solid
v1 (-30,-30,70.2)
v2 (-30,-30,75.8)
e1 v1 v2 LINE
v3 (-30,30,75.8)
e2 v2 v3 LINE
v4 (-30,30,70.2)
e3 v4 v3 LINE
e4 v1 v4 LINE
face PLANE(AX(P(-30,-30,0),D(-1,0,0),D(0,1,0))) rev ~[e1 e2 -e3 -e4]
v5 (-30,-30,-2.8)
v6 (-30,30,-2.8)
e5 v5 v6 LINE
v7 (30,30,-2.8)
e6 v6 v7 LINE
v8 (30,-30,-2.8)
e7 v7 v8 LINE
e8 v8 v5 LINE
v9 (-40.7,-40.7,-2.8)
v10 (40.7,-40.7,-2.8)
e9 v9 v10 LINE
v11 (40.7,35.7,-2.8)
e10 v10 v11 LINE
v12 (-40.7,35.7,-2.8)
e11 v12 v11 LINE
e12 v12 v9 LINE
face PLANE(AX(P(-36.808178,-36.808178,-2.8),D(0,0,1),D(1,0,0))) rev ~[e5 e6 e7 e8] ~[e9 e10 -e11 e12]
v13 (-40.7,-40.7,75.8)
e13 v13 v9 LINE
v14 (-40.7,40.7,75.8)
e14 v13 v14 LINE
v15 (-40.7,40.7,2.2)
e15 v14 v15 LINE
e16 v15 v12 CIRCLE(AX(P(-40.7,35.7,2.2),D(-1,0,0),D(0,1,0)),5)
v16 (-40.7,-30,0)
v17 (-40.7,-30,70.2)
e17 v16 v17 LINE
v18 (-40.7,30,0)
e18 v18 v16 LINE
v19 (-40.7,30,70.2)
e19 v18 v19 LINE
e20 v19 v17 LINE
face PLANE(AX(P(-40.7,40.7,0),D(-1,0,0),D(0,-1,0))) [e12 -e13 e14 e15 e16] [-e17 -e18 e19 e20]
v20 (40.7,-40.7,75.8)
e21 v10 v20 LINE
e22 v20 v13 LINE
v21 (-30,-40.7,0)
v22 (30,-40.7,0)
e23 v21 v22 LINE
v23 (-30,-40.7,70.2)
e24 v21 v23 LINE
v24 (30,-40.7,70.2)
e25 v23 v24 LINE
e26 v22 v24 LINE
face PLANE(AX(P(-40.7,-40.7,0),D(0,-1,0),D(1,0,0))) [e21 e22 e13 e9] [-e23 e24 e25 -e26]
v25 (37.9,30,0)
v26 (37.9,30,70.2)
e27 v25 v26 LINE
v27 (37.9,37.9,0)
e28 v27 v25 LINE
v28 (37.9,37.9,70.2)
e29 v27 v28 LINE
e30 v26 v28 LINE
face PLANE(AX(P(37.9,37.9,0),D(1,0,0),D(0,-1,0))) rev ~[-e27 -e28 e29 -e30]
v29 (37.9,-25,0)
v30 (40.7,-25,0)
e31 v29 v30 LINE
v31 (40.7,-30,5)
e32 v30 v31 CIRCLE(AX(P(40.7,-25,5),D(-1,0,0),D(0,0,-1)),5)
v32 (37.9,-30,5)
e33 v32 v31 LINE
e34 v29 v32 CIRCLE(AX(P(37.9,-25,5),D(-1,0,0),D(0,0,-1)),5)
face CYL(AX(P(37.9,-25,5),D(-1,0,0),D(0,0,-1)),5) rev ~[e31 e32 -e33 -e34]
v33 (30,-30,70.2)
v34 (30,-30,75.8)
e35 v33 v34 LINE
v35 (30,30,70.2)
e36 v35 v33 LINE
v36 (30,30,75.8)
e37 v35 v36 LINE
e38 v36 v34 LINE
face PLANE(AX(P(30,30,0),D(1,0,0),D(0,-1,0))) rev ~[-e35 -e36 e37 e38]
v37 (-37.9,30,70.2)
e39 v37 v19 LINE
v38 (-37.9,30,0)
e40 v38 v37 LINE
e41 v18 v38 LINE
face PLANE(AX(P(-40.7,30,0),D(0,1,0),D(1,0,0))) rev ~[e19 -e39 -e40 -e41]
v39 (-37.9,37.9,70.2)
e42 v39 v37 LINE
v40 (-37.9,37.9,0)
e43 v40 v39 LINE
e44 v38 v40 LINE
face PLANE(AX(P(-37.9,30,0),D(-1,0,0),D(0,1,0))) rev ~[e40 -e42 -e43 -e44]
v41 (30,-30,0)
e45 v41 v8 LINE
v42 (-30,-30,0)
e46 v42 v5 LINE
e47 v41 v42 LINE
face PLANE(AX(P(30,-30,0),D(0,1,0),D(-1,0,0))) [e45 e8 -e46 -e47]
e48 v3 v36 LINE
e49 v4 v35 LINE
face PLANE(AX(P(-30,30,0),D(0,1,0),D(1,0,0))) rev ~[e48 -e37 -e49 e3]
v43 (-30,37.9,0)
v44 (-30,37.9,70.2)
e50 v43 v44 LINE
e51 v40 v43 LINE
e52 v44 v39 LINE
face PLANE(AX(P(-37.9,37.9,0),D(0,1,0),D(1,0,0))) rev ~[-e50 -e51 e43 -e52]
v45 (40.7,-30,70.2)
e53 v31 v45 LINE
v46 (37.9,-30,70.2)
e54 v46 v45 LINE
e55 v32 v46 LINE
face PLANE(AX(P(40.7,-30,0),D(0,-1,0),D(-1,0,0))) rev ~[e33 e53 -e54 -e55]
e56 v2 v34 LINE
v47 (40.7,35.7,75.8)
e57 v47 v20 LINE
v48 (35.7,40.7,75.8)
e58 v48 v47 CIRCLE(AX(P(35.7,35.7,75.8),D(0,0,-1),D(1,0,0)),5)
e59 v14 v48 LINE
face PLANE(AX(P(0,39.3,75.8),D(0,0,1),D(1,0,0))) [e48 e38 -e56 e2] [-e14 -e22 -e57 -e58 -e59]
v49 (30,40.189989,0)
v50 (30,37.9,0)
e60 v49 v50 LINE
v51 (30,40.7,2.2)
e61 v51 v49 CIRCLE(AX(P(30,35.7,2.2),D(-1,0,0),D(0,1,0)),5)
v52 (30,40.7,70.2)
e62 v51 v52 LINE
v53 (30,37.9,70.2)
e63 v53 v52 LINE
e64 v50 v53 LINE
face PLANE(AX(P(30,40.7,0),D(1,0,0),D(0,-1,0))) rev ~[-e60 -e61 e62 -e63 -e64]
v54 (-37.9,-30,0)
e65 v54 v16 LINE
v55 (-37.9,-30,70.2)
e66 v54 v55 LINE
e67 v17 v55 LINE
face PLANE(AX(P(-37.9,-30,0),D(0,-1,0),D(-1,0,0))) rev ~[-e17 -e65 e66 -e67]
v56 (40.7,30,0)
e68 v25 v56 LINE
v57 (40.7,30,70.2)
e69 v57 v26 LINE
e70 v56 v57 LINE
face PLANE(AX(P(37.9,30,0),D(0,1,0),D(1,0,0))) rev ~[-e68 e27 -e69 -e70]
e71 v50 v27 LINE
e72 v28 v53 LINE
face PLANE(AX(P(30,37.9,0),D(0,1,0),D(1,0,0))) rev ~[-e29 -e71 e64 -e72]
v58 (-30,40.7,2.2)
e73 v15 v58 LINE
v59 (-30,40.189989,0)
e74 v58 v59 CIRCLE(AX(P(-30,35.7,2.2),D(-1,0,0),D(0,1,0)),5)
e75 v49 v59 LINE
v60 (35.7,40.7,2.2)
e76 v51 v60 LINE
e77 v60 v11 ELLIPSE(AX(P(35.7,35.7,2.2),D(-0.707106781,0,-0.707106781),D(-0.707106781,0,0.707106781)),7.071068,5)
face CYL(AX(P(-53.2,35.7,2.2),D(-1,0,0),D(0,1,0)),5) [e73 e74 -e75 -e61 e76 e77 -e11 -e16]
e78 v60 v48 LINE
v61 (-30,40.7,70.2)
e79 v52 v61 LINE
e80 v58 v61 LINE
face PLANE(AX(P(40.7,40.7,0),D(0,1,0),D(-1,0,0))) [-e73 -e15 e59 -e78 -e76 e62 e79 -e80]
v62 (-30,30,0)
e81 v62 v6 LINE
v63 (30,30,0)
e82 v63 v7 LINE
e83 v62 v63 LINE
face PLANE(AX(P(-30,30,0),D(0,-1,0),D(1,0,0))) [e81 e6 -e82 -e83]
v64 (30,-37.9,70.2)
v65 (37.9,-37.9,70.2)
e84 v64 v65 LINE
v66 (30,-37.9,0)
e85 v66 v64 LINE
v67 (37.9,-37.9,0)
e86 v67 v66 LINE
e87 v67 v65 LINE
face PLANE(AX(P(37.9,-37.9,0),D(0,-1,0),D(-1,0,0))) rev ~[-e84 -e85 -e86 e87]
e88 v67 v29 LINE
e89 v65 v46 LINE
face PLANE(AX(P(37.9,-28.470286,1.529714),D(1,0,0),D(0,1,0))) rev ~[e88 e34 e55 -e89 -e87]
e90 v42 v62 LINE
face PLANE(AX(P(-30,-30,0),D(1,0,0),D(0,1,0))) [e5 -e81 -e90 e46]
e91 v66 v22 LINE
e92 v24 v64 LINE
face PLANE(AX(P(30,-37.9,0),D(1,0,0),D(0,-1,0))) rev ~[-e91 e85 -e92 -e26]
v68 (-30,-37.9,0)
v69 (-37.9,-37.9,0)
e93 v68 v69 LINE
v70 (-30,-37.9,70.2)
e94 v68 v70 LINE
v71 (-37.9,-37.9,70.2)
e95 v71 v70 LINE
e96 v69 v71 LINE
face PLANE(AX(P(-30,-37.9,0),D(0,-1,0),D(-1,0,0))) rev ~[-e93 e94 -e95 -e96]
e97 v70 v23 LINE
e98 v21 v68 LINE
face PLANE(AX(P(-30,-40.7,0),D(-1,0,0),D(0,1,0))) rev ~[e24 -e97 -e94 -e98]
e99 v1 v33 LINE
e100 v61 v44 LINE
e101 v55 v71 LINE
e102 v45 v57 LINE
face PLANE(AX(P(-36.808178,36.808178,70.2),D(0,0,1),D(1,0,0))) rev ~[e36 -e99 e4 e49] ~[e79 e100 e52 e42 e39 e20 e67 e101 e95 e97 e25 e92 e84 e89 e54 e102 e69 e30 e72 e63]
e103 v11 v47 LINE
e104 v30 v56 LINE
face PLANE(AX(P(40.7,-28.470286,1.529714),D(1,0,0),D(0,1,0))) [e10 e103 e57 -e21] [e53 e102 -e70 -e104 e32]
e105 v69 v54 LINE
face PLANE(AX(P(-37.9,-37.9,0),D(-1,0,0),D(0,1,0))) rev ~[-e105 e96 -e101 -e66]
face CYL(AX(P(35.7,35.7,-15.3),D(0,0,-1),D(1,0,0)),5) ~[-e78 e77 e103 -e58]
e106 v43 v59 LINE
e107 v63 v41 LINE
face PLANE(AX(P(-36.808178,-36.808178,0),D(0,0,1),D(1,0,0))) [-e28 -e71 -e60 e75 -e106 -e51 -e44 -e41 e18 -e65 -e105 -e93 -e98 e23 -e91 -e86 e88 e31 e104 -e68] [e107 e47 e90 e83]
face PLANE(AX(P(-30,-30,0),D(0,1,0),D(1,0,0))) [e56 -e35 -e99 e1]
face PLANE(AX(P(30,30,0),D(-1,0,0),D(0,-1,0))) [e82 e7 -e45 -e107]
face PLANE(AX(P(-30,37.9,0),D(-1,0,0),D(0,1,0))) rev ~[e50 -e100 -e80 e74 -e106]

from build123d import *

# Parameters (mm, degrees)
F0_W        = 60
F0_H        = 2.8
F0_W_2      = 2.8
F0_H_2      = 60
F0_W_3      = 7.9
F0_H_3      = 7.9
F1_DEPTH    = 75.8
F2_DEPTH    = 70.2
F3_DEPTH    = 75.8
F4_DEPTH    = 2.8
F5_T1_DEPTH = 2.8
F5_T3_DEPTH = 106.4
F5_T5_DEPTH = 103.6


# Not quite as in the source:
# - a fillet or chamfer that OpenCascade refuses, or shapes differently, is made with other operations: its cross-section is extruded or revolved along the edge and cut away or added


with BuildPart() as f1:
    # F0 (on Top) → F1 (new body)
    with BuildSketch(Plane.XY):
        with Locations((0, 39.3)):
            Rectangle(F0_W, F0_H)
        Polygon((-40.7, 30), (-37.9, 30), (-37.9, 37.9), (-30, 37.9), (-30, 40.7), (-40.7, 40.7), align=None)
        Polygon((37.9, 37.9), (37.9, 30), (40.7, 30), (40.7, 40.7), (30, 40.7), (30, 37.9), align=None)
        with Locations((39.3, 0)):
            Rectangle(F0_W_2, F0_H_2)
        Polygon((37.9, -30), (37.9, -37.9), (30, -37.9), (30, -40.7), (40.7, -40.7), (40.7, -30), align=None)
        with Locations((0, -39.3)):
            Rectangle(F0_W, F0_H)
        Polygon((-30, -40.7), (-30, -37.9), (-37.9, -37.9), (-37.9, -30), (-40.7, -30), (-40.7, -40.7), align=None)
        with Locations((-39.3, 0)):
            Rectangle(F0_W_2, F0_H_2)
        with Locations((33.95, -33.95)):
            Rectangle(F0_W_3, F0_H_3)
        with Locations((33.95, 33.95)):
            Rectangle(F0_W_3, F0_H_3)
        with Locations((-33.95, 33.95)):
            Rectangle(F0_W_3, F0_H_3)
        with Locations((-33.95, 0)):
            Rectangle(F0_W_3, F0_H_2)
        with Locations((33.95, 0)):
            Rectangle(F0_W_3, F0_H_2)
        with Locations((-33.95, -33.95)):
            Rectangle(F0_W_3, F0_H_3)
        with Locations((0, -33.95)):
            Rectangle(F0_W, F0_H_3)
        with Locations((0, 33.95)):
            Rectangle(F0_W, F0_H_3)
    extrude(amount=F1_DEPTH)

    # F0 (on Top) → F2 (cut)
    with BuildSketch(Plane.XY):
        Polygon((-40.7, 30), (-37.9, 30), (-37.9, 37.9), (-30, 37.9), (-30, 40.7), (-40.7, 40.7), align=None)
        with Locations((-33.95, 33.95)):
            Rectangle(F0_W_3, F0_H_3)
        with Locations((-39.3, 0)):
            Rectangle(F0_W_2, F0_H_2)
        with Locations((-33.95, 0)):
            Rectangle(F0_W_3, F0_H_2)
        Polygon((-30, -40.7), (-30, -37.9), (-37.9, -37.9), (-37.9, -30), (-40.7, -30), (-40.7, -40.7), align=None)
        with Locations((-33.95, -33.95)):
            Rectangle(F0_W_3, F0_H_3)
        with Locations((0, -39.3)):
            Rectangle(F0_W, F0_H)
        with Locations((33.95, -33.95)):
            Rectangle(F0_W_3, F0_H_3)
        with Locations((33.95, 0)):
            Rectangle(F0_W_3, F0_H_2)
        with Locations((33.95, 33.95)):
            Rectangle(F0_W_3, F0_H_3)
        with Locations((0, 33.95)):
            Rectangle(F0_W, F0_H_3)
        with Locations((0, 39.3)):
            Rectangle(F0_W, F0_H)
        Polygon((37.9, 37.9), (37.9, 30), (40.7, 30), (40.7, 40.7), (30, 40.7), (30, 37.9), align=None)
        with Locations((39.3, 0)):
            Rectangle(F0_W_2, F0_H_2)
        Polygon((37.9, -30), (37.9, -37.9), (30, -37.9), (30, -40.7), (40.7, -40.7), (40.7, -30), align=None)
        with Locations((0, -33.95)):
            Rectangle(F0_W, F0_H_3)
    extrude(amount=F2_DEPTH, mode=Mode.SUBTRACT)

    # F0 (on Top) → F3 (join)
    with BuildSketch(Plane.XY):
        Polygon((-30, -40.7), (-30, -37.9), (-37.9, -37.9), (-37.9, -30), (-40.7, -30), (-40.7, -40.7), align=None)
        Polygon((37.9, -30), (37.9, -37.9), (30, -37.9), (30, -40.7), (40.7, -40.7), (40.7, -30), align=None)
        Polygon((37.9, 37.9), (37.9, 30), (40.7, 30), (40.7, 40.7), (30, 40.7), (30, 37.9), align=None)
        Polygon((-40.7, 30), (-37.9, 30), (-37.9, 37.9), (-30, 37.9), (-30, 40.7), (-40.7, 40.7), align=None)
    extrude(amount=F3_DEPTH)

    # F0 (on Top) → F4 (join)
    with BuildSketch(Plane.XY):
        Polygon((-30, -40.7), (-30, -37.9), (-37.9, -37.9), (-37.9, -30), (-40.7, -30), (-40.7, -40.7), align=None)
        with Locations((-33.95, -33.95)):
            Rectangle(F0_W_3, F0_H_3)
        with Locations((0, -33.95)):
            Rectangle(F0_W, F0_H_3)
        with Locations((0, -39.3)):
            Rectangle(F0_W, F0_H)
        Polygon((37.9, -30), (37.9, -37.9), (30, -37.9), (30, -40.7), (40.7, -40.7), (40.7, -30), align=None)
        with Locations((33.95, -33.95)):
            Rectangle(F0_W_3, F0_H_3)
        with Locations((39.3, 0)):
            Rectangle(F0_W_2, F0_H_2)
        with Locations((33.95, 0)):
            Rectangle(F0_W_3, F0_H_2)
        with Locations((33.95, 33.95)):
            Rectangle(F0_W_3, F0_H_3)
        Polygon((37.9, 37.9), (37.9, 30), (40.7, 30), (40.7, 40.7), (30, 40.7), (30, 37.9), align=None)
        with Locations((0, 33.95)):
            Rectangle(F0_W, F0_H_3)
        with Locations((0, 39.3)):
            Rectangle(F0_W, F0_H)
        with Locations((-33.95, 33.95)):
            Rectangle(F0_W_3, F0_H_3)
        Polygon((-40.7, 30), (-37.9, 30), (-37.9, 37.9), (-30, 37.9), (-30, 40.7), (-40.7, 40.7), align=None)
        with Locations((-39.3, 0)):
            Rectangle(F0_W_2, F0_H_2)
        with Locations((-33.95, 0)):
            Rectangle(F0_W_3, F0_H_2)
    extrude(amount=-F4_DEPTH)

    # F5: fillet of radius 5 on 3 edges, made by hand

    # F5_s2 → F5_t1 (join)
    with BuildSketch(Plane.YZ.offset(37.9)):
        with BuildLine():
            ThreePointArc((-25, 0), (-28.5355339059, 1.4644660941), (-30, 5))
            Line((-30, 5), (-30, 0))
            Line((-30, 0), (-25, 0))
        make_face()
    extrude(amount=F5_T1_DEPTH)

    # F5_s4 → F5_t3 (cut)
    with BuildSketch(Plane.YZ.offset(-53.2)):
        with BuildLine():
            ThreePointArc((40.7, 2.2), (39.2355339059, -1.3355339059), (35.7, -2.8))
            Line((35.7, -2.8), (40.7, -2.8))
            Line((40.7, -2.8), (40.7, 2.2))
        make_face()
    extrude(amount=F5_T3_DEPTH, mode=Mode.SUBTRACT)

    # F5_s6 → F5_t5 (cut)
    with BuildSketch(Plane.XY.offset(-15.3)):
        with BuildLine():
            ThreePointArc((40.7, 35.7), (39.2355339059, 39.2355339059), (35.7, 40.7))
            Line((35.7, 40.7), (40.7, 40.7))
            Line((40.7, 40.7), (40.7, 35.7))
        make_face()
    extrude(amount=F5_T5_DEPTH, mode=Mode.SUBTRACT)


solid = f1.part
